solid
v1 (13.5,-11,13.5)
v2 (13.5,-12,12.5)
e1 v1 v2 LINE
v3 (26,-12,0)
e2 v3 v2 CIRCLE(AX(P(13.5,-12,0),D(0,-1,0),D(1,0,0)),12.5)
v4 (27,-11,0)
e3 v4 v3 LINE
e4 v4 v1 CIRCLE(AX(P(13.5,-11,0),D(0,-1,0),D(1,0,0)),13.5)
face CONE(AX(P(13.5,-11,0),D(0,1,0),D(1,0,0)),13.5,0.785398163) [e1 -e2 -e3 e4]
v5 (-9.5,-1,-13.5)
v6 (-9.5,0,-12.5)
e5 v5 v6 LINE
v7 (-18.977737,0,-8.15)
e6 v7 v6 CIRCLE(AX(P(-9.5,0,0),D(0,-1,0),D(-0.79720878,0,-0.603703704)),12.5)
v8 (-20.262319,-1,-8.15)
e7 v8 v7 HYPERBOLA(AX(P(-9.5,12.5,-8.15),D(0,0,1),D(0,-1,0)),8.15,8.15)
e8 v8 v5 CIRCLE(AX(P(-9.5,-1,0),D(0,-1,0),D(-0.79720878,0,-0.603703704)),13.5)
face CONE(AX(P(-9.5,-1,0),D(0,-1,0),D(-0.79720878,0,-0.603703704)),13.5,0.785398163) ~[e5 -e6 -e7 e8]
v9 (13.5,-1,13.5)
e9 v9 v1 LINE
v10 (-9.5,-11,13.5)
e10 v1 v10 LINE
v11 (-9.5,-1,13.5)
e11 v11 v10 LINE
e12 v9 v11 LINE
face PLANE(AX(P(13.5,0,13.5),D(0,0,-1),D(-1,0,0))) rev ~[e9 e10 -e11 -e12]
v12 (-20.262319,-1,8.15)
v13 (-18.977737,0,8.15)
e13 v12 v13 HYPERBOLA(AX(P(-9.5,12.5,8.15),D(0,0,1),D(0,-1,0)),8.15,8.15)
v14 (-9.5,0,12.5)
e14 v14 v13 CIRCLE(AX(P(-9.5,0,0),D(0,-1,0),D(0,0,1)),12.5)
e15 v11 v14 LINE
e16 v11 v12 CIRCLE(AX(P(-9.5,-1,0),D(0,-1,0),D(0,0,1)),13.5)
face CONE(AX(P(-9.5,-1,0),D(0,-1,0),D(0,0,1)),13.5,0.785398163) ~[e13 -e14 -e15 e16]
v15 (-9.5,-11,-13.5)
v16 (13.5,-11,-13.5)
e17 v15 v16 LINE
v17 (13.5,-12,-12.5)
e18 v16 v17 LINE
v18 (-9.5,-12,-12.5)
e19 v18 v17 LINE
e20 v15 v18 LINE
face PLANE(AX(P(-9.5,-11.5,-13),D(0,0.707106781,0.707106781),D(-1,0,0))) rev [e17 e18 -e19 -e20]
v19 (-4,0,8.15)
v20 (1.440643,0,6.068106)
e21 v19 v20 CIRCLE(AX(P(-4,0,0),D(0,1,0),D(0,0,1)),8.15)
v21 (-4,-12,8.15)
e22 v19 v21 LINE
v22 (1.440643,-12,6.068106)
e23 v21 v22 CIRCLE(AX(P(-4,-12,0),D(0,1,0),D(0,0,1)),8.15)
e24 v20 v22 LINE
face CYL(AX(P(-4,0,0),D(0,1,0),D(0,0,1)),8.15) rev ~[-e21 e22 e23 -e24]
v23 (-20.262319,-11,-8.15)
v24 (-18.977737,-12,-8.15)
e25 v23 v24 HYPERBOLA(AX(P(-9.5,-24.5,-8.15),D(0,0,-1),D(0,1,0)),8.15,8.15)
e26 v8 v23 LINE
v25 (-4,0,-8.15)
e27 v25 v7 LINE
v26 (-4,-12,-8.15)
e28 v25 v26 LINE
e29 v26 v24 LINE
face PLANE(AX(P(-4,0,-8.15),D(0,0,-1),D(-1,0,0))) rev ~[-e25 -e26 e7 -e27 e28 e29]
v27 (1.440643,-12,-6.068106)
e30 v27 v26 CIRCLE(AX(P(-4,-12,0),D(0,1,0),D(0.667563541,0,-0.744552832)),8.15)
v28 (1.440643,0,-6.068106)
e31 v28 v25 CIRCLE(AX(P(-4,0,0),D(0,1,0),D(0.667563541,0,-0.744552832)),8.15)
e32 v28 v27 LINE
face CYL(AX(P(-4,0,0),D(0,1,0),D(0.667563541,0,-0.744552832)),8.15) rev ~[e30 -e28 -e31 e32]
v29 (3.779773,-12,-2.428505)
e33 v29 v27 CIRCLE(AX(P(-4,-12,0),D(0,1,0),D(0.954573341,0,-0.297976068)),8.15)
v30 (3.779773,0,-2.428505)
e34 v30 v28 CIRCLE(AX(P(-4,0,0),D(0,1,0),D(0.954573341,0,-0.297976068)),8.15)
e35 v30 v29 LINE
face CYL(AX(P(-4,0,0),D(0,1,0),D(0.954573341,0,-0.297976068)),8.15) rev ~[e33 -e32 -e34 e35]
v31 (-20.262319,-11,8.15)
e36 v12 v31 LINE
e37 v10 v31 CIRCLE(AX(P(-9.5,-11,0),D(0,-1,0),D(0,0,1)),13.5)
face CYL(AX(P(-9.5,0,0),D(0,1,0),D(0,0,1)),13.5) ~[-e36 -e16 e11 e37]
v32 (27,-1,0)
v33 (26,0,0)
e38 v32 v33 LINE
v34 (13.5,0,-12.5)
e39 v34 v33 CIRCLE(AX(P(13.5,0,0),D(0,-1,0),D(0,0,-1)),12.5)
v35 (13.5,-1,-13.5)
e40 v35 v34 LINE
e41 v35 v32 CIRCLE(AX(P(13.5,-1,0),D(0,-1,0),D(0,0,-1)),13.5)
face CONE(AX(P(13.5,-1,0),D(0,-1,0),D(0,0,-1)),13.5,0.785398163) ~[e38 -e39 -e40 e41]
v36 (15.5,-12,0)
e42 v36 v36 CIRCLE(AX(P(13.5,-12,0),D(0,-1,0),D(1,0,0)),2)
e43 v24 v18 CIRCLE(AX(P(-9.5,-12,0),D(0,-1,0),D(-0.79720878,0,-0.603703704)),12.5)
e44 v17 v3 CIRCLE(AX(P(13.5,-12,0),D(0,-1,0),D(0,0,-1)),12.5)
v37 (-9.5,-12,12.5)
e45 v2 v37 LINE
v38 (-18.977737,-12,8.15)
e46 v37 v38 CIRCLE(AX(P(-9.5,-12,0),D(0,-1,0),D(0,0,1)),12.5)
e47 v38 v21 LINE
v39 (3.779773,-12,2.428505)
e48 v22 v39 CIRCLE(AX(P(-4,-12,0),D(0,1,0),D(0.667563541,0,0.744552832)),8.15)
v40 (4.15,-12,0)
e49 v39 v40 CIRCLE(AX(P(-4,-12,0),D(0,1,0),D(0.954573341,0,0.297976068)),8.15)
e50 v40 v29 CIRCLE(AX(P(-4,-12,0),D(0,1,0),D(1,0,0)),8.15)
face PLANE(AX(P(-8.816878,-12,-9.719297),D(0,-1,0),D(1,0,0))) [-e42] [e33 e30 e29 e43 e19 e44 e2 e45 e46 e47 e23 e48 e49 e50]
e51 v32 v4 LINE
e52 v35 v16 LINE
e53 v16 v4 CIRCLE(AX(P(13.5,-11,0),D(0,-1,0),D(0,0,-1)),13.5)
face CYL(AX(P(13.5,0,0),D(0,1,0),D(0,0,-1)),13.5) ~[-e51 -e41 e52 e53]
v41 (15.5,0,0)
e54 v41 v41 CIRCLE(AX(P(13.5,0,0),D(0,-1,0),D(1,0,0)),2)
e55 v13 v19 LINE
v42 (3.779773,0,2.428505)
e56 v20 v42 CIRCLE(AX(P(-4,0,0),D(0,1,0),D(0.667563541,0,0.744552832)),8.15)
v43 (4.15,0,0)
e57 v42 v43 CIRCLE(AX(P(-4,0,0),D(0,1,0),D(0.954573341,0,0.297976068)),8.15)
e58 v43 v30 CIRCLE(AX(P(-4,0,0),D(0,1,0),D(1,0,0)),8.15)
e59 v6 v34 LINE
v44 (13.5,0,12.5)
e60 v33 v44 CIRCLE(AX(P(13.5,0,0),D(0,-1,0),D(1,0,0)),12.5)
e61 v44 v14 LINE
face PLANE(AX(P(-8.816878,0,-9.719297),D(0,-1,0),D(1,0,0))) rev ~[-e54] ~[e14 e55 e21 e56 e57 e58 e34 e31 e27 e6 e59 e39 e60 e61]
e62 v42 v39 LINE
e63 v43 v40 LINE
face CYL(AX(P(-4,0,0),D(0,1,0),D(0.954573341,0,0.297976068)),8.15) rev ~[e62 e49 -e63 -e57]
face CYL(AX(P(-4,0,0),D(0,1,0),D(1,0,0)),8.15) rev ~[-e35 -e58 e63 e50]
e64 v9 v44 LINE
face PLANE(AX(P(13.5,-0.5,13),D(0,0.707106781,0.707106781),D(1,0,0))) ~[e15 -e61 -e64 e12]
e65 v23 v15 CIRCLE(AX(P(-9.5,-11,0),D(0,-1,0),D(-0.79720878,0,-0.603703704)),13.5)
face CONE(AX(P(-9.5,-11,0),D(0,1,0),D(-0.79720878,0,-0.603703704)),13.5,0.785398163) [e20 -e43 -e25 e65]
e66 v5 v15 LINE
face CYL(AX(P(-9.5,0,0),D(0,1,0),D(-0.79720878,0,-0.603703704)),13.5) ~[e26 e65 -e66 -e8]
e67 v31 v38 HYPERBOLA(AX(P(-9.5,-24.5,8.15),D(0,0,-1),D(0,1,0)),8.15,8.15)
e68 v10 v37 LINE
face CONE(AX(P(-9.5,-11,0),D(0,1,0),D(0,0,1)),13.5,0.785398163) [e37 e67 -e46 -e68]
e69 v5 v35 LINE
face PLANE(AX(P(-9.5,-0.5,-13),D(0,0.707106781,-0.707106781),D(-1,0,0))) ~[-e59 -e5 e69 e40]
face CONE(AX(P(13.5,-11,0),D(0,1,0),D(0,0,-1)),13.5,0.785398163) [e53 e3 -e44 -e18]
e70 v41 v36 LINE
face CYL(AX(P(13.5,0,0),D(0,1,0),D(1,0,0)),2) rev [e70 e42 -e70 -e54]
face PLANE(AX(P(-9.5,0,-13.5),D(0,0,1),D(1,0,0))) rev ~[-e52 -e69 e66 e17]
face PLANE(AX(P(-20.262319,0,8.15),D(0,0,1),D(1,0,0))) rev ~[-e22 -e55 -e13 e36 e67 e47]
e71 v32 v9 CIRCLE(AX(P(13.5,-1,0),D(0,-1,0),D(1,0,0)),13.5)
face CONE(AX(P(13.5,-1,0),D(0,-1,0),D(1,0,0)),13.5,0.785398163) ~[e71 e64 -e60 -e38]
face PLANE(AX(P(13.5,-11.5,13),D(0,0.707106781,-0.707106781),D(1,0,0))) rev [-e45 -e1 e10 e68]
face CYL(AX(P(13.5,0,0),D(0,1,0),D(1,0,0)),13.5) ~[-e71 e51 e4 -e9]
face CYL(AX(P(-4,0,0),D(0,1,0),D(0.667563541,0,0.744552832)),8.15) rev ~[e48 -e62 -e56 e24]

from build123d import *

# Parameters (mm, degrees)
F0_R     = 2
F1_DEPTH = 12
F2_SIZE  = 1


with BuildPart() as f1:
    # F0 (on Front) → F1 (new body)
    with BuildSketch(Plane.XZ):
        with BuildLine():
            ThreePointArc((-9.5, -13.5), (-2.9124896759, -11.7836627468), (2, -7.0710678119))
            ThreePointArc((2, -7.0710678119), (1.7096518051, -6.5755371981), (1.4406428571, -6.0681055776))
            ThreePointArc((1.4406428571, -6.0681055776), (-1.087317427, -7.6117527698), (-4, -8.15))
            Line((-4, -8.15), (-20.2623185234, -8.15))
            ThreePointArc((-20.2623185234, -8.15), (-15.5093676872, -12.0887344251), (-9.5, -13.5))
        make_face()
        with BuildLine():
            Line((-9.5, -13.5), (13.5, -13.5))
            ThreePointArc((13.5, -13.5), (6.9124896759, -11.7836627468), (2, -7.0710678119))
            ThreePointArc((2, -7.0710678119), (-2.9124896759, -11.7836627468), (-9.5, -13.5))
        make_face()
        with BuildLine():
            ThreePointArc((1.4406428571, 6.0681055776), (1.7096518051, 6.5755371981), (2, 7.0710678119))
            ThreePointArc((2, 7.0710678119), (-2.9124896759, 11.7836627468), (-9.5, 13.5))
            ThreePointArc((-9.5, 13.5), (-15.5093676872, 12.0887344251), (-20.2623185234, 8.15))
            Line((-20.2623185234, 8.15), (-4, 8.15))
            ThreePointArc((-4, 8.15), (-1.087317427, 7.6117527698), (1.4406428571, 6.0681055776))
        make_face()
        with BuildLine():
            ThreePointArc((3.7797727273, 2.4285049541), (3.1054603873, 4.8324288328), (2, 7.0710678119))
            ThreePointArc((2, 7.0710678119), (1.7096518051, 6.5755371981), (1.4406428571, 6.0681055776))
            ThreePointArc((1.4406428571, 6.0681055776), (2.8561301206, 4.4063567456), (3.7797727273, 2.4285049541))
        make_face()
        with BuildLine():
            ThreePointArc((2, 7.0710678119), (6.9124896759, 11.7836627468), (13.5, 13.5))
            Line((13.5, 13.5), (-9.5, 13.5))
            ThreePointArc((-9.5, 13.5), (-2.9124896759, 11.7836627468), (2, 7.0710678119))
        make_face()
        with BuildLine():
            ThreePointArc((13.5, -13.5), (23.045941546, -9.545941546), (27, 0))
            ThreePointArc((27, 0), (23.045941546, 9.545941546), (13.5, 13.5))
            ThreePointArc((13.5, 13.5), (6.9124896759, 11.7836627468), (2, 7.0710678119))
            ThreePointArc((2, 7.0710678119), (3.1054603873, 4.8324288328), (3.7797727273, 2.4285049541))
            ThreePointArc((3.7797727273, 2.4285049541), (4.0569115586, 1.2282817822), (4.15, 0))
            ThreePointArc((4.15, 0), (4.0569115586, -1.2282817822), (3.7797727273, -2.4285049541))
            ThreePointArc((3.7797727273, -2.4285049541), (3.1054603873, -4.8324288328), (2, -7.0710678119))
            ThreePointArc((2, -7.0710678119), (6.9124896759, -11.7836627468), (13.5, -13.5))
        make_face()
        with Locations((13.5, 0)):
            Circle(F0_R, mode=Mode.SUBTRACT)
        with BuildLine():
            ThreePointArc((1.4406428571, -6.0681055776), (1.7096518051, -6.5755371981), (2, -7.0710678119))
            ThreePointArc((2, -7.0710678119), (3.1054603873, -4.8324288328), (3.7797727273, -2.4285049541))
            ThreePointArc((3.7797727273, -2.4285049541), (2.8561301206, -4.4063567456), (1.4406428571, -6.0681055776))
        make_face()
    extrude(amount=F1_DEPTH)

    # F2
    f2_edges = [f1.edges().sort_by_distance(p)[0] for p in [
        (27, -12, 0),
        (27, 0, 0),
        (-15.509368, 0, -12.088734),
        (-15.509368, -12, -12.088734),
        (2, 0, -13.5),
        (2, -12, -13.5),
        (2, 0, 13.5),
        (2, -12, 13.5),
        (-15.509368, 0, 12.088734),
        (-15.509368, -12, 12.088734),
    ]]
    chamfer(f2_edges, length=F2_SIZE)


solid = f1.part
